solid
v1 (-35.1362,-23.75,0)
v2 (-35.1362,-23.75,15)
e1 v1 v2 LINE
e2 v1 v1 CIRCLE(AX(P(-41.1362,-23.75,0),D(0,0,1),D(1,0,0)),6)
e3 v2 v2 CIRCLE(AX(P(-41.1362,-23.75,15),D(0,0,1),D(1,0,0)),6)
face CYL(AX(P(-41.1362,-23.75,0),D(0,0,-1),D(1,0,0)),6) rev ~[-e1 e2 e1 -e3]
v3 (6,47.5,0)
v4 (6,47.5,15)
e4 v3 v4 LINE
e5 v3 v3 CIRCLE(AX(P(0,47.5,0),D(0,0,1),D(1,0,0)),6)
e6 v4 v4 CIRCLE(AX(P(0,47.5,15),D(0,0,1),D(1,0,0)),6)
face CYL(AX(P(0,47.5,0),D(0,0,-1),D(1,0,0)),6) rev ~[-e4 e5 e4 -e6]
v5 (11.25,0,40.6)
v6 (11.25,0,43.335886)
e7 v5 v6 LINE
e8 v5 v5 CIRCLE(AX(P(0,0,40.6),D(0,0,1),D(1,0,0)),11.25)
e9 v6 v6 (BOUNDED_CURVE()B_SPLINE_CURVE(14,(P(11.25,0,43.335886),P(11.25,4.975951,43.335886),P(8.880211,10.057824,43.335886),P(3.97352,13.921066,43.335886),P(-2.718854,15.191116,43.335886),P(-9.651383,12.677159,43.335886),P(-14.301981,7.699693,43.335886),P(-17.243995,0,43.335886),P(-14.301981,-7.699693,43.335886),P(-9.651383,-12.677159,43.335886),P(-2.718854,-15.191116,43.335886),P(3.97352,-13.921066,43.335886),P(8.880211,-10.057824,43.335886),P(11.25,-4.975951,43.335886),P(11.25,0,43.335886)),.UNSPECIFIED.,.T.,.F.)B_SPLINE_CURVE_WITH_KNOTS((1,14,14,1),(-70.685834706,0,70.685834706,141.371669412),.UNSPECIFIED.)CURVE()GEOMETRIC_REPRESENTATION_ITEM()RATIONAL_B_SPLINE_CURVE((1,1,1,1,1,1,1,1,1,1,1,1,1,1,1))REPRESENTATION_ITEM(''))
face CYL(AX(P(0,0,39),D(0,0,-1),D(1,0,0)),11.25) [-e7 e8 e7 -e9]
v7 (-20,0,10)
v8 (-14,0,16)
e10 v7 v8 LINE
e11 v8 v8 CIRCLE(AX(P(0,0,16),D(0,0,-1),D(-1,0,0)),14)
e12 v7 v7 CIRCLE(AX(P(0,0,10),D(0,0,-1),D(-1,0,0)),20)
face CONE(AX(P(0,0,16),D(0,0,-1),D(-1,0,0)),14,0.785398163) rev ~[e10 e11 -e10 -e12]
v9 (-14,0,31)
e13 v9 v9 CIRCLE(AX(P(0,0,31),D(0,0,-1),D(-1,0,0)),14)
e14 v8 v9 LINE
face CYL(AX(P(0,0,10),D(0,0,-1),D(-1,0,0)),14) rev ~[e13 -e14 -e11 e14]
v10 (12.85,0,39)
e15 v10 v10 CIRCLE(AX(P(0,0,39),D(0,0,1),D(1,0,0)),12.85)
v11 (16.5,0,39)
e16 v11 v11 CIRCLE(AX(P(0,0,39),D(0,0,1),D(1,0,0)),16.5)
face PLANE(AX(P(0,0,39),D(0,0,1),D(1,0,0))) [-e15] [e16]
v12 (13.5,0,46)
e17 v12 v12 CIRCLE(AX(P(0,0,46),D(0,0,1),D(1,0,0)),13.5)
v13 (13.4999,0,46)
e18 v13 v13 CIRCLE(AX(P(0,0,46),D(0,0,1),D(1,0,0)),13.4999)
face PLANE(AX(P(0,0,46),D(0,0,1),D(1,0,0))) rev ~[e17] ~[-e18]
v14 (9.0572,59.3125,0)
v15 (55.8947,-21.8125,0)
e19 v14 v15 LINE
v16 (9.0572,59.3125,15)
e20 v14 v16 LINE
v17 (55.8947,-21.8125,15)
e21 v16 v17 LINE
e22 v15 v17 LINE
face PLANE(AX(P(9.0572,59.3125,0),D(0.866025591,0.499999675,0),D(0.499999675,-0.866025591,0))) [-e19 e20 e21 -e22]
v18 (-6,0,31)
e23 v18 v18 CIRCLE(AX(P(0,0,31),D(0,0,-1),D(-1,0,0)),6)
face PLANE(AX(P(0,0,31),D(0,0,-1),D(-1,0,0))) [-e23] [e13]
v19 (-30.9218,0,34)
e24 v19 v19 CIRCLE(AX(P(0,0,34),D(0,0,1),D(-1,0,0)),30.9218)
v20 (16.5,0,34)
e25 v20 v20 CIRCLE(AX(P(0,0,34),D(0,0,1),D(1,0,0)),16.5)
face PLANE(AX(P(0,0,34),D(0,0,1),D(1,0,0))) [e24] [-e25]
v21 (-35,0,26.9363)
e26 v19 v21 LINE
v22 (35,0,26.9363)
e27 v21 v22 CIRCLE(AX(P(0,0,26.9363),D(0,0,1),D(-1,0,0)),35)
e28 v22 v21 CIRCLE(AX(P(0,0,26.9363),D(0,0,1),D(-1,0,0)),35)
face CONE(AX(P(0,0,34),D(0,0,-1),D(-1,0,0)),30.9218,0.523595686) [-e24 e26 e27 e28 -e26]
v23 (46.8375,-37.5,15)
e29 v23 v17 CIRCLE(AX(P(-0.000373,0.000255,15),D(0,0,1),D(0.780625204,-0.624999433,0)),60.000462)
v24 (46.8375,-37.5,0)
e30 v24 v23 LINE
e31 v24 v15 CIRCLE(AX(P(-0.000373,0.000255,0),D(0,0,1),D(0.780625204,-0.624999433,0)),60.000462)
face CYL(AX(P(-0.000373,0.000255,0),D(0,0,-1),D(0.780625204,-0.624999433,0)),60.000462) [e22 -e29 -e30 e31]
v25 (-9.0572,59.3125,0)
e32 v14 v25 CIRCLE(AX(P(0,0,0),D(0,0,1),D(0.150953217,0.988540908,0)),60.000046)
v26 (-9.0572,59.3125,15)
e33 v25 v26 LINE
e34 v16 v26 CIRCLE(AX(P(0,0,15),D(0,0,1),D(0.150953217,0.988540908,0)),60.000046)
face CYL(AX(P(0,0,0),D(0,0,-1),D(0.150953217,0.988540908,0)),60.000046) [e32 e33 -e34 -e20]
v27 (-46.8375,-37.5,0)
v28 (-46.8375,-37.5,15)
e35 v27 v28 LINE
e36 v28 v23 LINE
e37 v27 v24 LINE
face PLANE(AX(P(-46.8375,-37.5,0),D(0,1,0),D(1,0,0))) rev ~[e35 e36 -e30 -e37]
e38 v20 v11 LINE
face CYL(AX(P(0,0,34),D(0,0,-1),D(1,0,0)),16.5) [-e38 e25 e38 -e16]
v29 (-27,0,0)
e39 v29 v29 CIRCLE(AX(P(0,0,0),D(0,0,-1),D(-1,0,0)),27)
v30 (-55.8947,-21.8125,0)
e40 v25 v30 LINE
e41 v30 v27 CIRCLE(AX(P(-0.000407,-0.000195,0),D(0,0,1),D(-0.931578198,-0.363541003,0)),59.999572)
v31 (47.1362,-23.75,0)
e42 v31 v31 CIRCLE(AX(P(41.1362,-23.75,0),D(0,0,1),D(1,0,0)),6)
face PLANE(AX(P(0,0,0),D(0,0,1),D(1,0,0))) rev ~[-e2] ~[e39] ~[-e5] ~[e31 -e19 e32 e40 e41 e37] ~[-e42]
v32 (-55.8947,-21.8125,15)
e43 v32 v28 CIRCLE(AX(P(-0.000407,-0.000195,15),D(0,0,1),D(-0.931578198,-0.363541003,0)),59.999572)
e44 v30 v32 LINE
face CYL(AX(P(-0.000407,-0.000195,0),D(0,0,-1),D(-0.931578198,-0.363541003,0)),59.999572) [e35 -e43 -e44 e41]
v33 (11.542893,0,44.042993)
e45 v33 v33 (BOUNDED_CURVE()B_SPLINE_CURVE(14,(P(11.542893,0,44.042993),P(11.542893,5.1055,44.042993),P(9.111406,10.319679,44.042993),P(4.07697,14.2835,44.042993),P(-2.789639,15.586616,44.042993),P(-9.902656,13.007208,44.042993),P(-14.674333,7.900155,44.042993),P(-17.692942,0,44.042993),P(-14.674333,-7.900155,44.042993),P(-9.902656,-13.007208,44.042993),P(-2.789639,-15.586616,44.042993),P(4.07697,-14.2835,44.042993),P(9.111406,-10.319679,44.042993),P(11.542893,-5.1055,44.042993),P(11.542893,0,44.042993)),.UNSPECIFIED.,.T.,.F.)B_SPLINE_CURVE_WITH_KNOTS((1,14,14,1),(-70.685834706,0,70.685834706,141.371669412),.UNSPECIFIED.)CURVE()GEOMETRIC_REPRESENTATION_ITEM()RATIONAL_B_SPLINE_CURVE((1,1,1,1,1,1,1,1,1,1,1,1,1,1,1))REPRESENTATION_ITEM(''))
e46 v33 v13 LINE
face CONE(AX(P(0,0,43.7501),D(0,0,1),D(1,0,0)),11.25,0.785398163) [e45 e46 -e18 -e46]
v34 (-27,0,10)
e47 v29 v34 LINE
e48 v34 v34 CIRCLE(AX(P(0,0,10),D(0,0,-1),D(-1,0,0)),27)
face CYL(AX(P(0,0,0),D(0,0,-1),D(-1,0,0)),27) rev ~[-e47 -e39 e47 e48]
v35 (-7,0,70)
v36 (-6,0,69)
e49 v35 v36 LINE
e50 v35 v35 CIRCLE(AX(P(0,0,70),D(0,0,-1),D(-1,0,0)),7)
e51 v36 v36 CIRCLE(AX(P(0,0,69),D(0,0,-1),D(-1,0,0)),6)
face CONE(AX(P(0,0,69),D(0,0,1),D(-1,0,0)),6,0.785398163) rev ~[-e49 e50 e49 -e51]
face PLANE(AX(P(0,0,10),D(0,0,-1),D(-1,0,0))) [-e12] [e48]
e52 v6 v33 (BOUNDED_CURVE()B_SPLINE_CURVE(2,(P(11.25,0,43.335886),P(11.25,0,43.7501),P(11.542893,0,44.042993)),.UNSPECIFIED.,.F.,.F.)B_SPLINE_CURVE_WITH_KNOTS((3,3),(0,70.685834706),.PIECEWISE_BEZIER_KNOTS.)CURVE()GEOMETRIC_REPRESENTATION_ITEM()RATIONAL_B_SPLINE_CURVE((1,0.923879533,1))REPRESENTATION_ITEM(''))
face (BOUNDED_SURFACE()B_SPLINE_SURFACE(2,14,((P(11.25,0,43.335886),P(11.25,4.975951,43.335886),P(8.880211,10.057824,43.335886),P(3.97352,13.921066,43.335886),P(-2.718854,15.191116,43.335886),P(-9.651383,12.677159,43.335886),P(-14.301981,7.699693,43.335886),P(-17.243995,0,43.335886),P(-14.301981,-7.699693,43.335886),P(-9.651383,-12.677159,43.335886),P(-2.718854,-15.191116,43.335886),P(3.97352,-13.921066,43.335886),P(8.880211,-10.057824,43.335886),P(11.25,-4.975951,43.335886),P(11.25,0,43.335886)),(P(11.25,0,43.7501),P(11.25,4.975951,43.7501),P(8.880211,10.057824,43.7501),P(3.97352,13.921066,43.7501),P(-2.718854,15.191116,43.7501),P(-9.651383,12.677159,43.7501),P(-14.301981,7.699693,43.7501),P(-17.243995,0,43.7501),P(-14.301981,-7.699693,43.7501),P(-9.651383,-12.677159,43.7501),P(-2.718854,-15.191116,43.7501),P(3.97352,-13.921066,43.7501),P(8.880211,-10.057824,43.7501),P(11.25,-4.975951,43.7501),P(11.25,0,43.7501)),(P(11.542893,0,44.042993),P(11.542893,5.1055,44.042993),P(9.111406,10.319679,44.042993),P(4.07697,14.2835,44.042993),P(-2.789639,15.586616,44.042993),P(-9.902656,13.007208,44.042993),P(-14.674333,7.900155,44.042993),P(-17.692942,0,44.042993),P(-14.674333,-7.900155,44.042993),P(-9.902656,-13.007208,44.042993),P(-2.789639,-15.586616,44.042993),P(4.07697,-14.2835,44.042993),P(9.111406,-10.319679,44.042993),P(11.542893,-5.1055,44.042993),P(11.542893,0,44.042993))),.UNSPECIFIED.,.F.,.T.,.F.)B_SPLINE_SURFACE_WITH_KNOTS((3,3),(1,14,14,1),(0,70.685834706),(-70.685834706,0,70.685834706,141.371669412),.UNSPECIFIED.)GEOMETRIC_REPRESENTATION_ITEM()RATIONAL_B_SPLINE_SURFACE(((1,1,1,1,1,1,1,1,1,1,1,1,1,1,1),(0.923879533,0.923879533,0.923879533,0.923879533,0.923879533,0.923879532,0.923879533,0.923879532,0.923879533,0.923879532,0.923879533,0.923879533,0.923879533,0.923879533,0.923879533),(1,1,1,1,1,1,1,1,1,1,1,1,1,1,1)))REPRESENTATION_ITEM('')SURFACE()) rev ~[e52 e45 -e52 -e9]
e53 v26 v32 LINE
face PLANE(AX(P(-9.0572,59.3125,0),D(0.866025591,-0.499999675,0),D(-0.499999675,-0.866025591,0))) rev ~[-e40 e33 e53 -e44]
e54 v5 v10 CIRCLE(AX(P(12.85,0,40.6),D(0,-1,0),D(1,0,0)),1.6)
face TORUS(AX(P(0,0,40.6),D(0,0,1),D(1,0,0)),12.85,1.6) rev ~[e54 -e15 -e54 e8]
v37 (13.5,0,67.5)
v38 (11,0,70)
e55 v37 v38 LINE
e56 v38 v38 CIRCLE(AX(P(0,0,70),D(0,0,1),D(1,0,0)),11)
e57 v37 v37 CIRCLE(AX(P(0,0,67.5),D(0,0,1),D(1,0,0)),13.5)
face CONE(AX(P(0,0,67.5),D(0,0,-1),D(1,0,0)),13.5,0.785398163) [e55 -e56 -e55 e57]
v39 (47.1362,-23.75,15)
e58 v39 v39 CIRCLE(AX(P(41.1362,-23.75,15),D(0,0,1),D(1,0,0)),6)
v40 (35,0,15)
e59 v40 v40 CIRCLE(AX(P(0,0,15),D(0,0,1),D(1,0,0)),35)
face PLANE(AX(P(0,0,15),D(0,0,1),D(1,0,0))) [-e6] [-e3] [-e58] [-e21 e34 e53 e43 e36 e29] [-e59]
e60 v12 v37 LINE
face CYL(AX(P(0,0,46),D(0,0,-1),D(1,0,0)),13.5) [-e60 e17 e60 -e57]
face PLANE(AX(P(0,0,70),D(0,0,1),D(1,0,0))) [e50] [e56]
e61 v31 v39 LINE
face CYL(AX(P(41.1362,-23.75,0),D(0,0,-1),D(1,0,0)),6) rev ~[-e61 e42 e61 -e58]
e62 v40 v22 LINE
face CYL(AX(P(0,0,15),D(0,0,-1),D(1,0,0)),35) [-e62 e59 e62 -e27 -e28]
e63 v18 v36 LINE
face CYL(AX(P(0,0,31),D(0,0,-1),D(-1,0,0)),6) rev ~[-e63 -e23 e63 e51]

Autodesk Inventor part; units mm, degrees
ref_plane "YZ Plane" through (0, 0, 0) normal (1, 0, 0) x (0, 1, 0)
ref_plane "XZ Plane" through (0, 0, 0) normal (0, 1, 0) x (-1, 0, 0)
ref_plane "XY Plane" through (0, 0, 0) normal (0, 0, 1) x (1, 0, 0)
sketch "Эскиз1" plane through (0, 0, 0) normal (0, 0, 1) x (1, 0, 0)
  line L0 (-9.0572, 59.3125) -> (-55.8947, -21.8125)
  line L1 (-46.8375, -37.5) -> (46.8375, -37.5)
  line L2 (9.0572, 59.3125) -> (55.8947, -21.8125)
  arc A0 (9.0572, 59.3125) -> (-9.0572, 59.3125) centre (0, 0) ccw
  arc A1 (-55.8947, -21.8125) -> (-46.8375, -37.5) centre (0, 0) ccw
  arc A2 (46.8375, -37.5) -> (55.8947, -21.8125) centre (0, 0) ccw
  circle A3 centre (0, 47.5) radius 6
  circle A4 centre (41.1362, -23.75) radius 6
  circle A5 centre (-41.1362, -23.75) radius 6
  point P0 (51.9615, -30)
  dimension "d3" = 12
  dimension "d4" = 12
  dimension "d5" = 12
  dimension "d7" = 47.5
  dimension "d8" = 41.1362
  dimension "d9" = 41.1362
  dimension "d10" = 13.75
  dimension "d11" = 13.75
  dimension "d12" = 13.75
extrude "Выдавливание1" add sketch "Эскиз1" along normal blind 15
sketch "Эскиз2" plane through (0, 0, 15) normal (0, 0, 1) x (1, 0, 0)
  circle A0 centre (0, 0) radius 35
  dimension "d15" = 70
extrude "Выдавливание2" add sketch "Эскиз2" along normal blind 19
sketch "Эскиз4" plane through (0, 0, 0) normal (0, 1, 0) x (-1, 0, 0)
  line L0 (35, 34) -> (-35, 34) projected
  line L1 (30.9218, 34) -> (35, 26.9363)
  line L2 (35, 15) -> (35, 34) projected
  line L3 (30.9218, 34) -> (35, 34)
  line L4 (0, -6.8) -> (0, 40.8) projected
  point P0 (0, 0)
  dimension "d21" = 30
revolve "Вращение1" cut sketch "Эскиз4" angle 360 about axis through (0, 0, -10) along (0, 0, 1)
sketch "Эскиз5" plane through (0, 0, 34) normal (0, 0, 1) x (1, 0, 0)
  circle A0 centre (0, 0) radius 16.5
  dimension "d23" = 33
extrude "Выдавливание3" add sketch "Эскиз5" along normal blind 5
sketch "Эскиз6" plane through (0, 0, 39) normal (0, 0, 1) x (1, 0, 0)
  circle A0 centre (0, 0) radius 11.25
  dimension "d26" = 22.5
extrude "Выдавливание4" add sketch "Эскиз6" along normal blind 7
sketch "Эскиз7" plane through (0, 0, 46) normal (0, 0, 1) x (1, 0, 0)
  circle A0 centre (0, 0) radius 13.5
  dimension "d29" = 27
extrude "Выдавливание5" add sketch "Эскиз7" along normal blind 24
sketch "Эскиз8" plane through (0, 0, 0) normal (0, 0, -1) x (-1, 0, 0)
  circle A0 centre (0, 0) radius 27
  dimension "d32" = 54
extrude "Выдавливание6" cut sketch "Эскиз8" against normal blind 10
sketch "Эскиз15" plane through (0, 0, 10) normal (0, 0, -1) x (-1, 0, 0)
  circle A0 centre (0, 0) radius 14
  dimension "d54" = 28
extrude "Выдавливание11" cut sketch "Эскиз15" against normal blind 21
chamfer "Фаска1" distance 6 angle 45 1 edges at (14, 0, 10)
sketch "Эскиз16" plane through (0, 0, 31) normal (0, 0, -1) x (-1, 0, 0)
  circle A0 centre (0, 0) radius 6
  dimension "d60" = 12
extrude "Выдавливание12" cut sketch "Эскиз16" against normal blind 39
thread "Резьба1" size "M27x3" class "6g" standard "ANSI Metric M Profile" full length
fillet "Сопряжение1" radius 1.6 1 edges at (-11.25, 0, 39)
chamfer "Фаска2" distance 2.25 angle 45 1 edges at (-11.25, 0, 46)
fillet "Сопряжение2" radius 1 1 edges at (-11.25, 0, 43.7501)
chamfer "Фаска3" distance 2.5 angle 45 1 edges at (-13.5, 0, 70)
chamfer "Фаска4" distance 1 angle 45 1 edges at (6, 0, 70)
